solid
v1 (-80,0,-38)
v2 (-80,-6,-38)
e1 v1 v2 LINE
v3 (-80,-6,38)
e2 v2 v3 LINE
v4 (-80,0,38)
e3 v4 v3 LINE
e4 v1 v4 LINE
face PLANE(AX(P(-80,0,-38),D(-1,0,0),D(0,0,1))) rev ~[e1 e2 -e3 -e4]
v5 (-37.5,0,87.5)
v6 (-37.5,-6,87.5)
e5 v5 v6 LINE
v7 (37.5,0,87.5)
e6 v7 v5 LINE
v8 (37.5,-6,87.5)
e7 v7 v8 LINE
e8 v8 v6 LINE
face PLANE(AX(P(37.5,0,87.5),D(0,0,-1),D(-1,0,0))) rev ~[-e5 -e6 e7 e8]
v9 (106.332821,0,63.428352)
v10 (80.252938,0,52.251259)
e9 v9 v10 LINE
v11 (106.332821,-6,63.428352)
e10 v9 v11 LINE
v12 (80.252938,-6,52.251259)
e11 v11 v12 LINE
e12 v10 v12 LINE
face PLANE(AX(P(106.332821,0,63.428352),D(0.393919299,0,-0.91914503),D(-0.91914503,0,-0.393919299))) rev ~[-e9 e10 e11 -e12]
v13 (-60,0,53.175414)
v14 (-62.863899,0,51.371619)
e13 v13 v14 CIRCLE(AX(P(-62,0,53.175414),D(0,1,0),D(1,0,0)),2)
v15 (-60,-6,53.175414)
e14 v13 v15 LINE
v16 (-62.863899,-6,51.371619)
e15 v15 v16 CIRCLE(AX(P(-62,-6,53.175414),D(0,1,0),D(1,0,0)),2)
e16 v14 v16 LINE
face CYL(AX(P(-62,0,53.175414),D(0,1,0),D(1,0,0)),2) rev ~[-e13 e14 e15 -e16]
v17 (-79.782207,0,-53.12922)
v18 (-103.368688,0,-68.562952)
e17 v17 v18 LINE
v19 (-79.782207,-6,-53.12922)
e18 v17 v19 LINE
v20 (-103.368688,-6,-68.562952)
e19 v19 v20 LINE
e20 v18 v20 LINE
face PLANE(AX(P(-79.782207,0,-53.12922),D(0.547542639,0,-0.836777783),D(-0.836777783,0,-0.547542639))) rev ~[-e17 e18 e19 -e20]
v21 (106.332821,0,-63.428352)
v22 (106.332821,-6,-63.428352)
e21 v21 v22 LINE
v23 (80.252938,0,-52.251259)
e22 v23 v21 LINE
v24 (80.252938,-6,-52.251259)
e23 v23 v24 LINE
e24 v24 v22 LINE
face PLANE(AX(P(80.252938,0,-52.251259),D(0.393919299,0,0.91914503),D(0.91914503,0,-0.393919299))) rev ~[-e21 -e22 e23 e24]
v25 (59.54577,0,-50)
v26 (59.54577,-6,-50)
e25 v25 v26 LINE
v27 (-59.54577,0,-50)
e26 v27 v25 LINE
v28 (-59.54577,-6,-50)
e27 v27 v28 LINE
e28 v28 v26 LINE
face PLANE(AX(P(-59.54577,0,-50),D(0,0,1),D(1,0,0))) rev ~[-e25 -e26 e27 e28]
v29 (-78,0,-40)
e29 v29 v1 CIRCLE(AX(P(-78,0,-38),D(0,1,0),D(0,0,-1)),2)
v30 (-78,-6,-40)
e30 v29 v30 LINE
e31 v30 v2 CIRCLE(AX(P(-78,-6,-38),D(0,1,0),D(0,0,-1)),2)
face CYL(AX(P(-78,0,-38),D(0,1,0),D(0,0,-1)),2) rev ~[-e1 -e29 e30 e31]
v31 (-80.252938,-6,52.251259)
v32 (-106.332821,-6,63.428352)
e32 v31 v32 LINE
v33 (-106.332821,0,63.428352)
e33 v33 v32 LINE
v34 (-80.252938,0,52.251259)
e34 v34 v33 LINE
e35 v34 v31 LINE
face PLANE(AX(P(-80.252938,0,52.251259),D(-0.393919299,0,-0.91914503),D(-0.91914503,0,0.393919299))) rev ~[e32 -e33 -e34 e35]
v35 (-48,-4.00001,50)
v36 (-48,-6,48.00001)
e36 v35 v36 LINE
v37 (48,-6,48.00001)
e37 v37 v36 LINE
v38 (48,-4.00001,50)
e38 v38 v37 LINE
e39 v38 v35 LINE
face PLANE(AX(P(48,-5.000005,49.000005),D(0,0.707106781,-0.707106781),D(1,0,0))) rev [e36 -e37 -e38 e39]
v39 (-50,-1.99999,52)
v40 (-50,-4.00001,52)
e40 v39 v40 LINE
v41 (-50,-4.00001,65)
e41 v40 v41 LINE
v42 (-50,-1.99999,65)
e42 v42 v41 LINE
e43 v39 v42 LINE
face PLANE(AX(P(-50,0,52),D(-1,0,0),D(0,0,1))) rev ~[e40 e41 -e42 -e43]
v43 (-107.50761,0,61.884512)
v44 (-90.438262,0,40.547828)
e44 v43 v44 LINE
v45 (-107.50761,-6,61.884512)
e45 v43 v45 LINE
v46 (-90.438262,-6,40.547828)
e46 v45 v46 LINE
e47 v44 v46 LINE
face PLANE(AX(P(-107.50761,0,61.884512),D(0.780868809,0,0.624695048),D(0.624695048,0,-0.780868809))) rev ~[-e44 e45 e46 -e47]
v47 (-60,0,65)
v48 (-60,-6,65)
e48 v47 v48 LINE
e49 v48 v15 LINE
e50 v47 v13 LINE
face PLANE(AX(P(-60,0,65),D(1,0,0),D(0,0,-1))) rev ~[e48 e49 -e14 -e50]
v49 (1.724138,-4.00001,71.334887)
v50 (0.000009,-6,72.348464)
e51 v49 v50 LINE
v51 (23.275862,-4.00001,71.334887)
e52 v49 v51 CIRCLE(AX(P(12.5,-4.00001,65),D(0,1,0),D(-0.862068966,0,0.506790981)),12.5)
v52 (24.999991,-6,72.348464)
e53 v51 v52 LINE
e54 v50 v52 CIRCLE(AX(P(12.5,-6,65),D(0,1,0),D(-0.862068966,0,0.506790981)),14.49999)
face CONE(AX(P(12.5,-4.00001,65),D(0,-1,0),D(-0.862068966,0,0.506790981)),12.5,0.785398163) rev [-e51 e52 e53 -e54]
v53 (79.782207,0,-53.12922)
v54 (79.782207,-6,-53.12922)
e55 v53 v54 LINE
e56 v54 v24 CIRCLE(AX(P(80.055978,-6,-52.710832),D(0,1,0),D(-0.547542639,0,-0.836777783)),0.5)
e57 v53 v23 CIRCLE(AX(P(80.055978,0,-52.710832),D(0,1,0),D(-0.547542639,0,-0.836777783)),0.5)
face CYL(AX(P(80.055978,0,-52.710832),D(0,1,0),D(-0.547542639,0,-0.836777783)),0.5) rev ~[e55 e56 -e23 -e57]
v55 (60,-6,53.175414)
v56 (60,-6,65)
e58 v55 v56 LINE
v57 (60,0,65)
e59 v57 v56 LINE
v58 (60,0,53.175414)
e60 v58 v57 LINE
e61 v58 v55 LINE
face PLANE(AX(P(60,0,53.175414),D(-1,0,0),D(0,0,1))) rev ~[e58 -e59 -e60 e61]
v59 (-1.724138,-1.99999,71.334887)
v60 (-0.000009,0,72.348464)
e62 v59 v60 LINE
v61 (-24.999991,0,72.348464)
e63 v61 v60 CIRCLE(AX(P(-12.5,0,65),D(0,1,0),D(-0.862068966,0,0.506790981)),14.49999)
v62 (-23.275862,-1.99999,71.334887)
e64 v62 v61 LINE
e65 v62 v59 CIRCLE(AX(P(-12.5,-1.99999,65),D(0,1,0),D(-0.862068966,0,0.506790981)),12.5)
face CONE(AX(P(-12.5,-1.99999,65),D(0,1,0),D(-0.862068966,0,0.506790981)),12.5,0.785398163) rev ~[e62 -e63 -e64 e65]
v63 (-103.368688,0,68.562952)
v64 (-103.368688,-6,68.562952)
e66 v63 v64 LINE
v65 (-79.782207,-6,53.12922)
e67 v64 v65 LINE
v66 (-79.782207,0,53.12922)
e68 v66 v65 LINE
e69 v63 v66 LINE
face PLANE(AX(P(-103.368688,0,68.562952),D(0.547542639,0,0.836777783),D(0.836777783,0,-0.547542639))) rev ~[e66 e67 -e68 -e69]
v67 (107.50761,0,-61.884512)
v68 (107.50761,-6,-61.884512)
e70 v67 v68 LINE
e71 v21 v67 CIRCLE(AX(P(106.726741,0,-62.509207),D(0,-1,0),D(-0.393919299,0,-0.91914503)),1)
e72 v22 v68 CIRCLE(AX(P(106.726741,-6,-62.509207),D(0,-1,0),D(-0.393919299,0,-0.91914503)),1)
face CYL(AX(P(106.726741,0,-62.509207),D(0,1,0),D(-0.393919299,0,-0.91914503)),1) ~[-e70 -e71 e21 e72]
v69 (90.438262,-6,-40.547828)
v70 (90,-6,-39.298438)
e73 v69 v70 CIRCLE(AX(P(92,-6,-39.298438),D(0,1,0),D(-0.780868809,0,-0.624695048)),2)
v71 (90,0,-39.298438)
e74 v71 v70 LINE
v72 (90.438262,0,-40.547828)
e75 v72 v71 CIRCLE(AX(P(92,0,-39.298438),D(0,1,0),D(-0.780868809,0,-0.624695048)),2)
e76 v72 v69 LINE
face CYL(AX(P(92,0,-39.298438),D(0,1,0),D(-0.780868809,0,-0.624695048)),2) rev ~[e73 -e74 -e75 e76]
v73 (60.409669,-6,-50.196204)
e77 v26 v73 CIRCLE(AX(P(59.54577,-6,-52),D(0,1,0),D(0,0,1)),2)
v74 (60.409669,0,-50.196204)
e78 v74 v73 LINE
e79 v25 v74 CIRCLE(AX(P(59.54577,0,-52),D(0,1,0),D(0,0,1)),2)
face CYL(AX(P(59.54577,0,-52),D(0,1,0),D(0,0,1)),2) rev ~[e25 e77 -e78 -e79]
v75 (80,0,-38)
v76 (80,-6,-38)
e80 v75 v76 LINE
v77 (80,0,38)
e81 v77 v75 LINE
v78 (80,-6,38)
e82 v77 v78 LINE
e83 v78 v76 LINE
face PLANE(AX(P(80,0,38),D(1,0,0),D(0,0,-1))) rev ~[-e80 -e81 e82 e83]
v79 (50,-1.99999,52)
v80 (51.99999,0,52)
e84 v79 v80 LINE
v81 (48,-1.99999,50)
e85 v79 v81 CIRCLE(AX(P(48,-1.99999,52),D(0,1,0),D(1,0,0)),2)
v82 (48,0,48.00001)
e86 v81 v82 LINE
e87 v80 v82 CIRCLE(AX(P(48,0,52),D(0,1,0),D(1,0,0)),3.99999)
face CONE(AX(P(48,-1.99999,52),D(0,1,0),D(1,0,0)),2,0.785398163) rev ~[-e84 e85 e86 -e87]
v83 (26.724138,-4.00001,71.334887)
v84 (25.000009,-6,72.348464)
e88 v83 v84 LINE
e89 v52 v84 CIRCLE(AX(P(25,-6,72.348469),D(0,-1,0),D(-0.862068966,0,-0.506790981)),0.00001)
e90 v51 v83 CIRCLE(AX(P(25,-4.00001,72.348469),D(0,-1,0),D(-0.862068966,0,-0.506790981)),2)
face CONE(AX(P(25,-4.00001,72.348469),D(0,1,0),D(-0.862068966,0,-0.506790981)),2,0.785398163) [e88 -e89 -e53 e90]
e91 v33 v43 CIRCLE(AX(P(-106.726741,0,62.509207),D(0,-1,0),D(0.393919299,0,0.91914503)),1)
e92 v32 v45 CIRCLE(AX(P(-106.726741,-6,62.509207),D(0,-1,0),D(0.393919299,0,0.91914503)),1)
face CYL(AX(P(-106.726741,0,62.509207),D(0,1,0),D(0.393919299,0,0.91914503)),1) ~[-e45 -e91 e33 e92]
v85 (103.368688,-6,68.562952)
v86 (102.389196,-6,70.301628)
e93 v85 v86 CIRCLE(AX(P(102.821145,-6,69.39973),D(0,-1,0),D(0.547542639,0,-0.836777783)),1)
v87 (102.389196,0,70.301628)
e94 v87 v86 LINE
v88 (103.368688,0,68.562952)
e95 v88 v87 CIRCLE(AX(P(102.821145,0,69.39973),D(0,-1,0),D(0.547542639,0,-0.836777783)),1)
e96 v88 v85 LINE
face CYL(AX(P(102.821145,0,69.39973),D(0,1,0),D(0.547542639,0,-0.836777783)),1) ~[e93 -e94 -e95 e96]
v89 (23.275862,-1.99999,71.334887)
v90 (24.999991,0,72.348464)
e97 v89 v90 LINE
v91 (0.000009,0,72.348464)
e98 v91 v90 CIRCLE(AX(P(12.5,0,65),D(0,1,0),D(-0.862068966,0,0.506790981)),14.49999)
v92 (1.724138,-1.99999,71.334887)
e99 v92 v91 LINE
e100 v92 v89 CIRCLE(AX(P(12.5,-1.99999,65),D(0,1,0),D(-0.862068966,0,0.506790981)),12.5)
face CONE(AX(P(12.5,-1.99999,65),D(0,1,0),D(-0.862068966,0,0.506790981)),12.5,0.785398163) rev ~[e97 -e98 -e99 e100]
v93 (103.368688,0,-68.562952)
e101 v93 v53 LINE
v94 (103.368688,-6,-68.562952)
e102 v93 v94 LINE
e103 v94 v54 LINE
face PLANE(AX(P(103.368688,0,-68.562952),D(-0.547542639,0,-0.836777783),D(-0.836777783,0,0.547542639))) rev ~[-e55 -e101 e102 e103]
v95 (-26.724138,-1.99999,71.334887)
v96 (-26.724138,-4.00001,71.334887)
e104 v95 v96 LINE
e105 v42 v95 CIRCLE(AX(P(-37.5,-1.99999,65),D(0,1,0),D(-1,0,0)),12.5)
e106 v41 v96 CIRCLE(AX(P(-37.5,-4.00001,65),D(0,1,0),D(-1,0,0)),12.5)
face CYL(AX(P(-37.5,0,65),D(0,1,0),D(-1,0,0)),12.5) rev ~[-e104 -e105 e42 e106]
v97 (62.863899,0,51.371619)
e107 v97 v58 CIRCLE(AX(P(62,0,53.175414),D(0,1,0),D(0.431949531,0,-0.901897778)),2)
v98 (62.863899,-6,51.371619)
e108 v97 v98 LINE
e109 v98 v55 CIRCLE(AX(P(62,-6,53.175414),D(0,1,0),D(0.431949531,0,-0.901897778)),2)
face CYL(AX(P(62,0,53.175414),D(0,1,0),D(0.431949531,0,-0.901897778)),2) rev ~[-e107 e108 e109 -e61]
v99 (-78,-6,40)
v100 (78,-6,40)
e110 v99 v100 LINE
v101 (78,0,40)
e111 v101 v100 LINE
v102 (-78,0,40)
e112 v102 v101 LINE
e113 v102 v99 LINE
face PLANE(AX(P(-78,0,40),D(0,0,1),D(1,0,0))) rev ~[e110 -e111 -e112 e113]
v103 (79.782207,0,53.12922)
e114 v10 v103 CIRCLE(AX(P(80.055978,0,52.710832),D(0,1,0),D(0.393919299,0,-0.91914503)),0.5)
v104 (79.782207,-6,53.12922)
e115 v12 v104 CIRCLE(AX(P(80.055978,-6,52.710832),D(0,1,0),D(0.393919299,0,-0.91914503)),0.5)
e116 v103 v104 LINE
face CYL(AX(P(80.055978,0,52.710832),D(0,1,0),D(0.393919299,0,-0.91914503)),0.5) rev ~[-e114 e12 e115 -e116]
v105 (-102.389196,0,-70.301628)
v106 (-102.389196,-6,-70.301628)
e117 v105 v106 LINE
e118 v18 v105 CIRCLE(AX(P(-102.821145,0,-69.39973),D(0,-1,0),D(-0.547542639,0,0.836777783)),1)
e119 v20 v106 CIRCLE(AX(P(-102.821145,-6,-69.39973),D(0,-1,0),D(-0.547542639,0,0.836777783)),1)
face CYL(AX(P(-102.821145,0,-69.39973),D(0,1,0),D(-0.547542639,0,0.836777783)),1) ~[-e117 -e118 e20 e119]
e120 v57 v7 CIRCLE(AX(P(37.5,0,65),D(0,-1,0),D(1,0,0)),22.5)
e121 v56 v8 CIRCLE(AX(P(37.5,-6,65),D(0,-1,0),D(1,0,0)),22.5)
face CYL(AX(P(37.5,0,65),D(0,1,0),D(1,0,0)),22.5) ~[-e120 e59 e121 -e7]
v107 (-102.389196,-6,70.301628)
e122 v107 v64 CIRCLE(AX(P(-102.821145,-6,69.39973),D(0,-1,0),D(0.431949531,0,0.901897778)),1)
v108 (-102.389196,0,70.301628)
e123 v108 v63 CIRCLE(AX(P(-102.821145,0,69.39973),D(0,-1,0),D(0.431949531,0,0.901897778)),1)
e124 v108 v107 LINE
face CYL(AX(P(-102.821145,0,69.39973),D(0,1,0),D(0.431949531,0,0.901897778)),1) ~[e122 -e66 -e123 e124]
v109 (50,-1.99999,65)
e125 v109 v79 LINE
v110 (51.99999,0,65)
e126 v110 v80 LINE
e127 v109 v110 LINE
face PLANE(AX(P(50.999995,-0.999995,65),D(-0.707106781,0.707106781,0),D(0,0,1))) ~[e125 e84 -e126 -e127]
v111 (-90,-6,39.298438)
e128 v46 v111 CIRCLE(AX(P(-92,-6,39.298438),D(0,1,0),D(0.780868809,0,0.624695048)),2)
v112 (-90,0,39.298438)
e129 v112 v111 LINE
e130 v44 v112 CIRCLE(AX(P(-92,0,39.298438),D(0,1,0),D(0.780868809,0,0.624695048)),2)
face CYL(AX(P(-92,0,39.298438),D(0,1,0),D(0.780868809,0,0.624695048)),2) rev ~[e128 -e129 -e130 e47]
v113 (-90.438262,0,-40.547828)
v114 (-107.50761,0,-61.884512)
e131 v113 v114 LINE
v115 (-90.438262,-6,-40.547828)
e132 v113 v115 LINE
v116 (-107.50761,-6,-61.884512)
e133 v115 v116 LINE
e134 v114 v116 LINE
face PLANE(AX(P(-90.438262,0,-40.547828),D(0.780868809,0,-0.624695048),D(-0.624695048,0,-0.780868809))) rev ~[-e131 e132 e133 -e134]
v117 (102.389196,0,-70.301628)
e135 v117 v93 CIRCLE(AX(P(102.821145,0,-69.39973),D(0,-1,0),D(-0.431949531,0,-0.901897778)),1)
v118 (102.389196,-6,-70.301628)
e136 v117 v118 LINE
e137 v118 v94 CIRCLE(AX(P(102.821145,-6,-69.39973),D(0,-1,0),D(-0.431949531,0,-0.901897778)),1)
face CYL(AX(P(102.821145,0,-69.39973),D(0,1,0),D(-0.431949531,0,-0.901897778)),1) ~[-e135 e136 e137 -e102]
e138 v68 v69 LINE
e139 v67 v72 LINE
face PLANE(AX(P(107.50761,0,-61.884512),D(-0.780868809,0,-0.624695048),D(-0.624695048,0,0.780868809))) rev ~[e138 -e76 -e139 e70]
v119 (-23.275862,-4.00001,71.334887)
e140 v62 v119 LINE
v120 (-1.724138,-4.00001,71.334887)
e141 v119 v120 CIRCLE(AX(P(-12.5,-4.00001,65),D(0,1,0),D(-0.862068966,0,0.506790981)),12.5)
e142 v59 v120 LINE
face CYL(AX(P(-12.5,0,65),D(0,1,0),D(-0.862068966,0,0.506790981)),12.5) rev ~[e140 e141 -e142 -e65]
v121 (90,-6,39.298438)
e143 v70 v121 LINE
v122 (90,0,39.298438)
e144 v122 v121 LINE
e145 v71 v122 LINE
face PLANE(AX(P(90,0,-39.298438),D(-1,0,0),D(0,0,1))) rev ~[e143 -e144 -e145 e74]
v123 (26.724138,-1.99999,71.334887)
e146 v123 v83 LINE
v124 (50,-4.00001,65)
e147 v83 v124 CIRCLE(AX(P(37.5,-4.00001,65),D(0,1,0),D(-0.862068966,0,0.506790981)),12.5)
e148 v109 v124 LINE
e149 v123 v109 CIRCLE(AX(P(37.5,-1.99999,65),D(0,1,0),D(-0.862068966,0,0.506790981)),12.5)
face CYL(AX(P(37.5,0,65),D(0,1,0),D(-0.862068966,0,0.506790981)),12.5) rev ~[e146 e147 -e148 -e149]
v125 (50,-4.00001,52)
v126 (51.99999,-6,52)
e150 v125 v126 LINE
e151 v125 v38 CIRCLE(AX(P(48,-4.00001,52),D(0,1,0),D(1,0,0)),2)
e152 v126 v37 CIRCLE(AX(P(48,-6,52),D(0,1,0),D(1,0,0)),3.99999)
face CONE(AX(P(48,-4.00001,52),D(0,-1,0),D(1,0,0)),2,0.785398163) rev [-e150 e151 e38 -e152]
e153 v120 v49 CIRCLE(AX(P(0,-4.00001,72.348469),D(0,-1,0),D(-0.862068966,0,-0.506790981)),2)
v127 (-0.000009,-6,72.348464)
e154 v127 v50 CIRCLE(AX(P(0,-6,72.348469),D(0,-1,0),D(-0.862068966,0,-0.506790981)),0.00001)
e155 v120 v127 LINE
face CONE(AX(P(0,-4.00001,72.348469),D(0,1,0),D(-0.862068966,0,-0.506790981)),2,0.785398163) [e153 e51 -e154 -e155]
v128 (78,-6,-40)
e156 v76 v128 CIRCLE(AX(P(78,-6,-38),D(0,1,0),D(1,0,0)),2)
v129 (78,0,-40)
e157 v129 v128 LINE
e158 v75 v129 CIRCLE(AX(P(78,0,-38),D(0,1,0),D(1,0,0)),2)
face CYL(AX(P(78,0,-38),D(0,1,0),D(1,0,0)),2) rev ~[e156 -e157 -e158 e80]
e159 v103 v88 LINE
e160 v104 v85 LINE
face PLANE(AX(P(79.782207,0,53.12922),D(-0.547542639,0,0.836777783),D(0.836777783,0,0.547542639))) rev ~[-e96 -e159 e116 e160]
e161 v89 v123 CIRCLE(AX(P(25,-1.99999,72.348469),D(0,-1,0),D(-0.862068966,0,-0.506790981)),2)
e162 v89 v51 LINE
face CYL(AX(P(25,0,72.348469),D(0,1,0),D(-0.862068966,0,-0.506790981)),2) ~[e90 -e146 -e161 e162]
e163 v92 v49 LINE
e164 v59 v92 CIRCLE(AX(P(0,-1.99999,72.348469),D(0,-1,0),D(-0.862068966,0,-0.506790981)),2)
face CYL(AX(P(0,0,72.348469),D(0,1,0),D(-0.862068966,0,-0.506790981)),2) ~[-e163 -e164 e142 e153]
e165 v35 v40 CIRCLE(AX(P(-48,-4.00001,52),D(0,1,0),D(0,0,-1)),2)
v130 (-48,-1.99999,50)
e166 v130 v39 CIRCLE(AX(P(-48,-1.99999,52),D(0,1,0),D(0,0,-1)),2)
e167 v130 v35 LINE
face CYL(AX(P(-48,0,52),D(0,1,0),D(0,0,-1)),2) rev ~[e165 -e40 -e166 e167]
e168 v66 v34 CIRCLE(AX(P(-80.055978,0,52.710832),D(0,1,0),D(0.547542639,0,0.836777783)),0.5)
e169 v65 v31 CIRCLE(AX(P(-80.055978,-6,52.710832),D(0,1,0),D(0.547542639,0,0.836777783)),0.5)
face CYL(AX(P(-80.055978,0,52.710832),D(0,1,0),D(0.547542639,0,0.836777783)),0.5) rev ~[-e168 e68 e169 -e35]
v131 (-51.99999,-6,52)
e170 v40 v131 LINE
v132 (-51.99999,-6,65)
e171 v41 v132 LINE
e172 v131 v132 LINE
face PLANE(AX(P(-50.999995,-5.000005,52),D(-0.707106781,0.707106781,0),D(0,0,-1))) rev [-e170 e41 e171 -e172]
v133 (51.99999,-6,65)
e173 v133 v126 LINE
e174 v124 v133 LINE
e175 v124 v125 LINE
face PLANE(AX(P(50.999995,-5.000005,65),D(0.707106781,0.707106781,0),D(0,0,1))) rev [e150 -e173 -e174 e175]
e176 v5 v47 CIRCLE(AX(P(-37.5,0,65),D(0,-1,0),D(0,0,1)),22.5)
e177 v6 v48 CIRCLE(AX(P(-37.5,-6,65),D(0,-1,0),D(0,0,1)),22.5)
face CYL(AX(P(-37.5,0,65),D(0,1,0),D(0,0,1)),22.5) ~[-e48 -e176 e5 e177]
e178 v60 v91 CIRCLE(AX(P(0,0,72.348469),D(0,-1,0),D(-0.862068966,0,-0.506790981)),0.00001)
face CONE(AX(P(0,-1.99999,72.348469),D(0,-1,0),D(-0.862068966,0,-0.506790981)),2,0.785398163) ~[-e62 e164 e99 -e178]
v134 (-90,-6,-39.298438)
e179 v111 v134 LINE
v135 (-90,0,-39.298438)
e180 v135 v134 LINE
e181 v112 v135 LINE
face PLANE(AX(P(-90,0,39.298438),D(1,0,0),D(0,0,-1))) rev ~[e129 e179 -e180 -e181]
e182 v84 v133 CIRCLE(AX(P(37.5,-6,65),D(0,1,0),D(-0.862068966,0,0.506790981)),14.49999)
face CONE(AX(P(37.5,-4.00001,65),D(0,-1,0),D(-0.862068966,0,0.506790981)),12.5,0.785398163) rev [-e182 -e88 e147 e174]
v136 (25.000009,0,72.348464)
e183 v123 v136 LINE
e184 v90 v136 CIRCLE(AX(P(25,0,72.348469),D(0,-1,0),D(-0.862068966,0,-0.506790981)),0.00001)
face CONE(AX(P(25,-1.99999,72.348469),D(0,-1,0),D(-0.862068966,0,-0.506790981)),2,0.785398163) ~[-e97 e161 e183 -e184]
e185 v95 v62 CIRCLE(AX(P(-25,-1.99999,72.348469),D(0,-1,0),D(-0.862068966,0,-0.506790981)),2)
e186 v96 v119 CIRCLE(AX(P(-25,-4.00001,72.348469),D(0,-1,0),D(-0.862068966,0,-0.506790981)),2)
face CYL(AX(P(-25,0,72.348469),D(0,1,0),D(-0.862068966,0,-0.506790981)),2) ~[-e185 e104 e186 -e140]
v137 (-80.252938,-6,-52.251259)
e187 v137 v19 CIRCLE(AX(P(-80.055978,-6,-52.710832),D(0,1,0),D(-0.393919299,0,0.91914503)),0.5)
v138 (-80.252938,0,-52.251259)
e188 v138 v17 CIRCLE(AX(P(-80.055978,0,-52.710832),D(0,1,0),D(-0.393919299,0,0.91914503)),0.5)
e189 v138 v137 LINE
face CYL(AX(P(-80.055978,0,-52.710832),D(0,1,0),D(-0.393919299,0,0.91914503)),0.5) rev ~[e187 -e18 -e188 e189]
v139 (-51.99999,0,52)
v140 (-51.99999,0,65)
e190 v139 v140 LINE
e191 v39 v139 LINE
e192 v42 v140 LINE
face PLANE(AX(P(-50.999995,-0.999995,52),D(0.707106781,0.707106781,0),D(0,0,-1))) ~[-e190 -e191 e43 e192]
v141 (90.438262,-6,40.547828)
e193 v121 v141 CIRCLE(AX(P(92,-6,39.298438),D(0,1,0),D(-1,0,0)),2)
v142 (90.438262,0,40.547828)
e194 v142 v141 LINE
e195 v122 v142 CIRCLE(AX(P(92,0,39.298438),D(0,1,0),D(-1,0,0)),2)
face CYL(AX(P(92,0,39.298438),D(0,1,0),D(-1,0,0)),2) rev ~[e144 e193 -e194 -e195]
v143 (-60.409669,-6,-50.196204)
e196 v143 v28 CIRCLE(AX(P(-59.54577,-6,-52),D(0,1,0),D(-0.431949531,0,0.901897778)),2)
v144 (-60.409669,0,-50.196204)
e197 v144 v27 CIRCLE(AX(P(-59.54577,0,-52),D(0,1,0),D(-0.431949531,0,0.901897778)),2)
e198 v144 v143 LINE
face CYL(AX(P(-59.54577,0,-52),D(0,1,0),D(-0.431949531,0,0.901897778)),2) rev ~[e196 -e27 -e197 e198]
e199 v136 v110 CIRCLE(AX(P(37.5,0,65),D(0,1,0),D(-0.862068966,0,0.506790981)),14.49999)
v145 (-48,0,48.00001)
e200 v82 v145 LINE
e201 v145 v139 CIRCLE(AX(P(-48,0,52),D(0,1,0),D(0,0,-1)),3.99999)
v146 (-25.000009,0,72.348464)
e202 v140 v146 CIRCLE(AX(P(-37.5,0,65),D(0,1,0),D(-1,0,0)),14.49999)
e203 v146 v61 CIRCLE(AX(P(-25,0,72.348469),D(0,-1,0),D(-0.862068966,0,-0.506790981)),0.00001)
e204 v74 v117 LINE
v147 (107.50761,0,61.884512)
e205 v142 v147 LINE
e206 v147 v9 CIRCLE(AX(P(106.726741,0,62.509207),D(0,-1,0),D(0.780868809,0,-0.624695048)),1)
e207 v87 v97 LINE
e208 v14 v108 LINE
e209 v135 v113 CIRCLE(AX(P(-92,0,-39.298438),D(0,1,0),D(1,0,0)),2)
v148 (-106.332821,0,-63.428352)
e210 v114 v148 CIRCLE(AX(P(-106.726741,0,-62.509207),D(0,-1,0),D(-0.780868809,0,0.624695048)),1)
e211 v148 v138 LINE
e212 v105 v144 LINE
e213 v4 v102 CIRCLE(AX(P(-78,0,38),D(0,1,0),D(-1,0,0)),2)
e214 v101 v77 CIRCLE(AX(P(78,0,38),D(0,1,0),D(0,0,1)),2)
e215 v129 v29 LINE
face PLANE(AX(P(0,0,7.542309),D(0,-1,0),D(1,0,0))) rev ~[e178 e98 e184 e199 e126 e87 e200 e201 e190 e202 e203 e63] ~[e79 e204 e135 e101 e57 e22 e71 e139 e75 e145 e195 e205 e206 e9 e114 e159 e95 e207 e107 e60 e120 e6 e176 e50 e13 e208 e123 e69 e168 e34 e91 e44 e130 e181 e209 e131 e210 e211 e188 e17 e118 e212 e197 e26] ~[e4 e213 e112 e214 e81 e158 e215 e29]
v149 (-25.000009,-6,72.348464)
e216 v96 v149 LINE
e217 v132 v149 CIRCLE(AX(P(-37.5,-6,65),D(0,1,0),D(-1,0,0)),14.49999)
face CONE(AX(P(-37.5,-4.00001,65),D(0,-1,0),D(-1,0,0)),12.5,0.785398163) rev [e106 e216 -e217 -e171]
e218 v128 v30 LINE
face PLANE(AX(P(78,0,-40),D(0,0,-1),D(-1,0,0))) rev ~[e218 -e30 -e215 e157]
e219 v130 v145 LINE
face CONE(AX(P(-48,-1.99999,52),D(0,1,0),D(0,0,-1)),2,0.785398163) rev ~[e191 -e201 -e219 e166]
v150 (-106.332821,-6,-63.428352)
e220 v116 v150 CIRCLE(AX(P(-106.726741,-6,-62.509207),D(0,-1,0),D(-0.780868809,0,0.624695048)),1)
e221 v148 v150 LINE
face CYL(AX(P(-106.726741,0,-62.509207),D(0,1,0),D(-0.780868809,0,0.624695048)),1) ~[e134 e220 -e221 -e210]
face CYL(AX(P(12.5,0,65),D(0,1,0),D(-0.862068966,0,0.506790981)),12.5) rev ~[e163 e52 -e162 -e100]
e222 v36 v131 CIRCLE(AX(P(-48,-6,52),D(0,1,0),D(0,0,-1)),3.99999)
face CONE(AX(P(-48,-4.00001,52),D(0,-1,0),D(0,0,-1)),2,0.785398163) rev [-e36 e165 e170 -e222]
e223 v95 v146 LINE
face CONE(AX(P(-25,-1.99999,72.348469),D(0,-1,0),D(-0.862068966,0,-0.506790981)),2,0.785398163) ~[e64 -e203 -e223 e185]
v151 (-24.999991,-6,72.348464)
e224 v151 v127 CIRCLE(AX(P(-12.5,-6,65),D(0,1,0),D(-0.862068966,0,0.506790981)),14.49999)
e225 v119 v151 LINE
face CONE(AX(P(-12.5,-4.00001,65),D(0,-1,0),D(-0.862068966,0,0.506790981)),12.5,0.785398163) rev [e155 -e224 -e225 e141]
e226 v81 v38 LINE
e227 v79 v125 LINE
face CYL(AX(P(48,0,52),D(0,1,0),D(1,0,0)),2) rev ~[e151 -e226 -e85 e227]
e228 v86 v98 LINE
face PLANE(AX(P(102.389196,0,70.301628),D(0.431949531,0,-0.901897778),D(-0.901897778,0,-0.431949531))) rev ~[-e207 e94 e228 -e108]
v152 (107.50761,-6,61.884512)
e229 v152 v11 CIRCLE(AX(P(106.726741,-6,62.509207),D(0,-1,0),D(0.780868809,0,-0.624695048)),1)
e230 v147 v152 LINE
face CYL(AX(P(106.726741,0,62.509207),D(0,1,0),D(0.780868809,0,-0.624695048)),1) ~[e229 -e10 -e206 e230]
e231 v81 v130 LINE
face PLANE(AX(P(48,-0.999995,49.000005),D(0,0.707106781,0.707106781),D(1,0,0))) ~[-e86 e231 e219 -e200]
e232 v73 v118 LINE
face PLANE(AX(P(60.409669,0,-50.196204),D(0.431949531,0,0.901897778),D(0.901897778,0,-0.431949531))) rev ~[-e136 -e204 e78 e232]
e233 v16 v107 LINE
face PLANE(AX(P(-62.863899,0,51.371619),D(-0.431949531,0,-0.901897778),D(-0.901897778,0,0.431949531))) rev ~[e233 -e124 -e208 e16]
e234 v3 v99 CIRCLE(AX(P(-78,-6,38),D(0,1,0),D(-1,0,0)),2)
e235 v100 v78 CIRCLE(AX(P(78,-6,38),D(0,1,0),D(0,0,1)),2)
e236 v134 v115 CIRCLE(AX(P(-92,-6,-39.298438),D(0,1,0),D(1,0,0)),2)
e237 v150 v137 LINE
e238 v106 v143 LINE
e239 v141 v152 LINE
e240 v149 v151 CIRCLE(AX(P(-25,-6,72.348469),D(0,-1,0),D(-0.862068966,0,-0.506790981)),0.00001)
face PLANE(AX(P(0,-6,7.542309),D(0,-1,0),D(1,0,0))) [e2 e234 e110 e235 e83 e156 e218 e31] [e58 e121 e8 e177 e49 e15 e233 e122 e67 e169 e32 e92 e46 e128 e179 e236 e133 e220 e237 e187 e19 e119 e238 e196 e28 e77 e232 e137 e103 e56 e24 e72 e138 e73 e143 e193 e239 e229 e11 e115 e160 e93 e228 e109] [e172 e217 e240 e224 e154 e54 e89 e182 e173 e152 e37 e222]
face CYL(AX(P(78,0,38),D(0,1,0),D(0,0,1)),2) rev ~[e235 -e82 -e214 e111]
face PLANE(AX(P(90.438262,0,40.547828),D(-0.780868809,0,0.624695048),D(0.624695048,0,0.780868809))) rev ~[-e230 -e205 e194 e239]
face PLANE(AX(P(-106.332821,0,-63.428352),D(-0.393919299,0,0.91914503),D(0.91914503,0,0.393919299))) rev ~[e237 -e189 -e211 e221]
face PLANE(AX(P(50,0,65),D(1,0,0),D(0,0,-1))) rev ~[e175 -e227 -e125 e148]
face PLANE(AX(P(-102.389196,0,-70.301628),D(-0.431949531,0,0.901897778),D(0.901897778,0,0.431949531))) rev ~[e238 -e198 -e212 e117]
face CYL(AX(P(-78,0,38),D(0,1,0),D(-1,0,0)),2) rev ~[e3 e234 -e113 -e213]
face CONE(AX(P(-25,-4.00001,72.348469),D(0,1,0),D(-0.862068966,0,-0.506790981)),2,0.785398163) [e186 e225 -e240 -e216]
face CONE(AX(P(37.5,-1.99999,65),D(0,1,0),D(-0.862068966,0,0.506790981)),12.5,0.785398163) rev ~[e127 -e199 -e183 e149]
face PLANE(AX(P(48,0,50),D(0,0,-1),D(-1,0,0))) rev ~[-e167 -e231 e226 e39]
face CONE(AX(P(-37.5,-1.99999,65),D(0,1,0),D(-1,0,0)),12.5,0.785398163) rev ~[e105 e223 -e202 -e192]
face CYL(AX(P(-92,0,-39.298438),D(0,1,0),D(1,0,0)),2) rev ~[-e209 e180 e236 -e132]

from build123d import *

# Parameters (mm, degrees)
F1_DEPTH = 6
F2_SIZE  = 1.99999


# Not quite as in the source:
# - a fillet or chamfer is up to 0.001 mm smaller than in the source, because OpenCascade refuses the exact size


with BuildPart() as f1:
    # F0 (on Front) → F1 (new body)
    with BuildSketch(Plane.XZ):
        with BuildLine():
            Line((-59.5457699822, -50), (59.5457699822, -50))
            ThreePointArc((59.5457699822, -50), (59.9887196894, -50.0496678342), (60.409669044, -50.1962044431))
            Line((60.409669044, -50.1962044431), (102.3891955872, -70.3016279512))
            ThreePointArc((102.3891955872, -70.3016279512), (103.6924020371, -69.8905574143), (103.3686877569, -68.5629523894))
            Line((103.3686877569, -68.5629523894), (79.7822069148, -53.1292204996))
            ThreePointArc((79.7822069148, -53.1292204996), (79.6153206959, -52.4745670657), (80.2529378835, -52.2512590929))
            Line((80.2529378835, -52.2512590929), (106.3328214803, -63.428352063))
            ThreePointArc((106.3328214803, -63.428352063), (107.5225378807, -63.1147703845), (107.5076095883, -61.8845119854))
            Line((107.5076095883, -61.8845119854), (90.4382623811, -40.5478279764))
            ThreePointArc((90.4382623811, -40.5478279764), (90.1127433617, -39.9604517642), (90, -39.2984378813))
            Line((90, -39.2984378813), (90, 39.2984378813))
            ThreePointArc((90, 39.2984378813), (90.1127433617, 39.9604517642), (90.4382623811, 40.5478279764))
            Line((90.4382623811, 40.5478279764), (107.5076095883, 61.8845119854))
            ThreePointArc((107.5076095883, 61.8845119854), (107.5225378807, 63.1147703845), (106.3328214803, 63.428352063))
            Line((106.3328214803, 63.428352063), (80.2529378835, 52.2512590929))
            ThreePointArc((80.2529378835, 52.2512590929), (79.6153206959, 52.4745670657), (79.7822069148, 53.1292204996))
            Line((79.7822069148, 53.1292204996), (103.3686877569, 68.5629523894))
            ThreePointArc((103.3686877569, 68.5629523894), (103.6924020371, 69.8905574143), (102.3891955872, 70.3016279512))
            Line((102.3891955872, 70.3016279512), (62.8638990618, 51.3716186976))
            ThreePointArc((62.8638990618, 51.3716186976), (60.9341196417, 51.4831084128), (60, 53.1754142545))
            Line((60, 53.1754142545), (60, 65))
            ThreePointArc((60, 65), (53.4099025767, 80.9099025767), (37.5, 87.5))
            Line((37.5, 87.5), (0, 87.5))
            Line((0, 87.5), (-37.5, 87.5))
            ThreePointArc((-37.5, 87.5), (-53.4099025767, 80.9099025767), (-60, 65))
            Line((-60, 65), (-60, 53.1754142545))
            ThreePointArc((-60, 53.1754142545), (-60.9341196417, 51.4831084128), (-62.8638990618, 51.3716186976))
            Line((-62.8638990618, 51.3716186976), (-102.3891955872, 70.3016279512))
            ThreePointArc((-102.3891955872, 70.3016279512), (-103.6924020371, 69.8905574143), (-103.3686877569, 68.5629523894))
            Line((-103.3686877569, 68.5629523894), (-79.7822069148, 53.1292204996))
            ThreePointArc((-79.7822069148, 53.1292204996), (-79.6153206959, 52.4745670657), (-80.2529378835, 52.2512590929))
            Line((-80.2529378835, 52.2512590929), (-106.3328214803, 63.428352063))
            ThreePointArc((-106.3328214803, 63.428352063), (-107.5225378807, 63.1147703845), (-107.5076095883, 61.8845119854))
            Line((-107.5076095883, 61.8845119854), (-90.4382623811, 40.5478279764))
            ThreePointArc((-90.4382623811, 40.5478279764), (-90.1127433617, 39.9604517642), (-90, 39.2984378813))
            Line((-90, 39.2984378813), (-90, -39.2984378813))
            ThreePointArc((-90, -39.2984378813), (-90.1127433617, -39.9604517642), (-90.4382623811, -40.5478279764))
            Line((-90.4382623811, -40.5478279764), (-107.5076095883, -61.8845119854))
            ThreePointArc((-107.5076095883, -61.8845119854), (-107.5225378807, -63.1147703845), (-106.3328214803, -63.428352063))
            Line((-106.3328214803, -63.428352063), (-80.2529378835, -52.2512590929))
            ThreePointArc((-80.2529378835, -52.2512590929), (-79.6153206959, -52.4745670657), (-79.7822069148, -53.1292204996))
            Line((-79.7822069148, -53.1292204996), (-103.3686877569, -68.5629523894))
            ThreePointArc((-103.3686877569, -68.5629523894), (-103.6924020371, -69.8905574143), (-102.3891955872, -70.3016279512))
            Line((-102.3891955872, -70.3016279512), (-60.409669044, -50.1962044431))
            ThreePointArc((-60.409669044, -50.1962044431), (-59.9887196894, -50.0496678342), (-59.5457699822, -50))
        make_face()
        with BuildLine():
            Line((-78, 40), (78, 40))
            ThreePointArc((78, 40), (79.4142135624, 39.4142135624), (80, 38))
            Line((80, 38), (80, -38))
            ThreePointArc((80, -38), (79.4142135624, -39.4142135624), (78, -40))
            Line((78, -40), (-78, -40))
            ThreePointArc((-78, -40), (-79.4142135624, -39.4142135624), (-80, -38))
            Line((-80, -38), (-80, 38))
            ThreePointArc((-80, 38), (-79.4142135624, 39.4142135624), (-78, 40))
        make_face(mode=Mode.SUBTRACT)
        with BuildLine():
            Line((48, 50), (40, 50))
            Line((40, 50), (0, 50))
            Line((0, 50), (-25, 50))
            Line((-25, 50), (-40, 50))
            Line((-40, 50), (-48, 50))
            ThreePointArc((-48, 50), (-49.4142135624, 50.5857864376), (-50, 52))
            Line((-50, 52), (-50, 65))
            ThreePointArc((-50, 65), (-40.7826608215, 77.0612660169), (-26.724137931, 71.3348872658))
            ThreePointArc((-26.724137931, 71.3348872658), (-25, 70.3484692283), (-23.275862069, 71.3348872658))
            ThreePointArc((-23.275862069, 71.3348872658), (-12.5, 77.5), (-1.724137931, 71.3348872658))
            ThreePointArc((-1.724137931, 71.3348872658), (0, 70.3484692283), (1.724137931, 71.3348872658))
            ThreePointArc((1.724137931, 71.3348872658), (12.5, 77.5), (23.275862069, 71.3348872658))
            ThreePointArc((23.275862069, 71.3348872658), (25, 70.3484692283), (26.724137931, 71.3348872658))
            ThreePointArc((26.724137931, 71.3348872658), (40.7826608215, 77.0612660169), (50, 65))
            Line((50, 65), (50, 52))
            ThreePointArc((50, 52), (49.4142135624, 50.5857864376), (48, 50))
        make_face(mode=Mode.SUBTRACT)
    extrude(amount=F1_DEPTH)

    # F2 (size 2 in the source; OpenCascade refuses exactly that, so slightly less here)
    f2_edges = [f1.edges().sort_by_distance(p)[0] for p in [
        (0, -6, 50),
        (0, 0, 50),
    ]]
    chamfer(f2_edges, length=F2_SIZE)


solid = f1.part
